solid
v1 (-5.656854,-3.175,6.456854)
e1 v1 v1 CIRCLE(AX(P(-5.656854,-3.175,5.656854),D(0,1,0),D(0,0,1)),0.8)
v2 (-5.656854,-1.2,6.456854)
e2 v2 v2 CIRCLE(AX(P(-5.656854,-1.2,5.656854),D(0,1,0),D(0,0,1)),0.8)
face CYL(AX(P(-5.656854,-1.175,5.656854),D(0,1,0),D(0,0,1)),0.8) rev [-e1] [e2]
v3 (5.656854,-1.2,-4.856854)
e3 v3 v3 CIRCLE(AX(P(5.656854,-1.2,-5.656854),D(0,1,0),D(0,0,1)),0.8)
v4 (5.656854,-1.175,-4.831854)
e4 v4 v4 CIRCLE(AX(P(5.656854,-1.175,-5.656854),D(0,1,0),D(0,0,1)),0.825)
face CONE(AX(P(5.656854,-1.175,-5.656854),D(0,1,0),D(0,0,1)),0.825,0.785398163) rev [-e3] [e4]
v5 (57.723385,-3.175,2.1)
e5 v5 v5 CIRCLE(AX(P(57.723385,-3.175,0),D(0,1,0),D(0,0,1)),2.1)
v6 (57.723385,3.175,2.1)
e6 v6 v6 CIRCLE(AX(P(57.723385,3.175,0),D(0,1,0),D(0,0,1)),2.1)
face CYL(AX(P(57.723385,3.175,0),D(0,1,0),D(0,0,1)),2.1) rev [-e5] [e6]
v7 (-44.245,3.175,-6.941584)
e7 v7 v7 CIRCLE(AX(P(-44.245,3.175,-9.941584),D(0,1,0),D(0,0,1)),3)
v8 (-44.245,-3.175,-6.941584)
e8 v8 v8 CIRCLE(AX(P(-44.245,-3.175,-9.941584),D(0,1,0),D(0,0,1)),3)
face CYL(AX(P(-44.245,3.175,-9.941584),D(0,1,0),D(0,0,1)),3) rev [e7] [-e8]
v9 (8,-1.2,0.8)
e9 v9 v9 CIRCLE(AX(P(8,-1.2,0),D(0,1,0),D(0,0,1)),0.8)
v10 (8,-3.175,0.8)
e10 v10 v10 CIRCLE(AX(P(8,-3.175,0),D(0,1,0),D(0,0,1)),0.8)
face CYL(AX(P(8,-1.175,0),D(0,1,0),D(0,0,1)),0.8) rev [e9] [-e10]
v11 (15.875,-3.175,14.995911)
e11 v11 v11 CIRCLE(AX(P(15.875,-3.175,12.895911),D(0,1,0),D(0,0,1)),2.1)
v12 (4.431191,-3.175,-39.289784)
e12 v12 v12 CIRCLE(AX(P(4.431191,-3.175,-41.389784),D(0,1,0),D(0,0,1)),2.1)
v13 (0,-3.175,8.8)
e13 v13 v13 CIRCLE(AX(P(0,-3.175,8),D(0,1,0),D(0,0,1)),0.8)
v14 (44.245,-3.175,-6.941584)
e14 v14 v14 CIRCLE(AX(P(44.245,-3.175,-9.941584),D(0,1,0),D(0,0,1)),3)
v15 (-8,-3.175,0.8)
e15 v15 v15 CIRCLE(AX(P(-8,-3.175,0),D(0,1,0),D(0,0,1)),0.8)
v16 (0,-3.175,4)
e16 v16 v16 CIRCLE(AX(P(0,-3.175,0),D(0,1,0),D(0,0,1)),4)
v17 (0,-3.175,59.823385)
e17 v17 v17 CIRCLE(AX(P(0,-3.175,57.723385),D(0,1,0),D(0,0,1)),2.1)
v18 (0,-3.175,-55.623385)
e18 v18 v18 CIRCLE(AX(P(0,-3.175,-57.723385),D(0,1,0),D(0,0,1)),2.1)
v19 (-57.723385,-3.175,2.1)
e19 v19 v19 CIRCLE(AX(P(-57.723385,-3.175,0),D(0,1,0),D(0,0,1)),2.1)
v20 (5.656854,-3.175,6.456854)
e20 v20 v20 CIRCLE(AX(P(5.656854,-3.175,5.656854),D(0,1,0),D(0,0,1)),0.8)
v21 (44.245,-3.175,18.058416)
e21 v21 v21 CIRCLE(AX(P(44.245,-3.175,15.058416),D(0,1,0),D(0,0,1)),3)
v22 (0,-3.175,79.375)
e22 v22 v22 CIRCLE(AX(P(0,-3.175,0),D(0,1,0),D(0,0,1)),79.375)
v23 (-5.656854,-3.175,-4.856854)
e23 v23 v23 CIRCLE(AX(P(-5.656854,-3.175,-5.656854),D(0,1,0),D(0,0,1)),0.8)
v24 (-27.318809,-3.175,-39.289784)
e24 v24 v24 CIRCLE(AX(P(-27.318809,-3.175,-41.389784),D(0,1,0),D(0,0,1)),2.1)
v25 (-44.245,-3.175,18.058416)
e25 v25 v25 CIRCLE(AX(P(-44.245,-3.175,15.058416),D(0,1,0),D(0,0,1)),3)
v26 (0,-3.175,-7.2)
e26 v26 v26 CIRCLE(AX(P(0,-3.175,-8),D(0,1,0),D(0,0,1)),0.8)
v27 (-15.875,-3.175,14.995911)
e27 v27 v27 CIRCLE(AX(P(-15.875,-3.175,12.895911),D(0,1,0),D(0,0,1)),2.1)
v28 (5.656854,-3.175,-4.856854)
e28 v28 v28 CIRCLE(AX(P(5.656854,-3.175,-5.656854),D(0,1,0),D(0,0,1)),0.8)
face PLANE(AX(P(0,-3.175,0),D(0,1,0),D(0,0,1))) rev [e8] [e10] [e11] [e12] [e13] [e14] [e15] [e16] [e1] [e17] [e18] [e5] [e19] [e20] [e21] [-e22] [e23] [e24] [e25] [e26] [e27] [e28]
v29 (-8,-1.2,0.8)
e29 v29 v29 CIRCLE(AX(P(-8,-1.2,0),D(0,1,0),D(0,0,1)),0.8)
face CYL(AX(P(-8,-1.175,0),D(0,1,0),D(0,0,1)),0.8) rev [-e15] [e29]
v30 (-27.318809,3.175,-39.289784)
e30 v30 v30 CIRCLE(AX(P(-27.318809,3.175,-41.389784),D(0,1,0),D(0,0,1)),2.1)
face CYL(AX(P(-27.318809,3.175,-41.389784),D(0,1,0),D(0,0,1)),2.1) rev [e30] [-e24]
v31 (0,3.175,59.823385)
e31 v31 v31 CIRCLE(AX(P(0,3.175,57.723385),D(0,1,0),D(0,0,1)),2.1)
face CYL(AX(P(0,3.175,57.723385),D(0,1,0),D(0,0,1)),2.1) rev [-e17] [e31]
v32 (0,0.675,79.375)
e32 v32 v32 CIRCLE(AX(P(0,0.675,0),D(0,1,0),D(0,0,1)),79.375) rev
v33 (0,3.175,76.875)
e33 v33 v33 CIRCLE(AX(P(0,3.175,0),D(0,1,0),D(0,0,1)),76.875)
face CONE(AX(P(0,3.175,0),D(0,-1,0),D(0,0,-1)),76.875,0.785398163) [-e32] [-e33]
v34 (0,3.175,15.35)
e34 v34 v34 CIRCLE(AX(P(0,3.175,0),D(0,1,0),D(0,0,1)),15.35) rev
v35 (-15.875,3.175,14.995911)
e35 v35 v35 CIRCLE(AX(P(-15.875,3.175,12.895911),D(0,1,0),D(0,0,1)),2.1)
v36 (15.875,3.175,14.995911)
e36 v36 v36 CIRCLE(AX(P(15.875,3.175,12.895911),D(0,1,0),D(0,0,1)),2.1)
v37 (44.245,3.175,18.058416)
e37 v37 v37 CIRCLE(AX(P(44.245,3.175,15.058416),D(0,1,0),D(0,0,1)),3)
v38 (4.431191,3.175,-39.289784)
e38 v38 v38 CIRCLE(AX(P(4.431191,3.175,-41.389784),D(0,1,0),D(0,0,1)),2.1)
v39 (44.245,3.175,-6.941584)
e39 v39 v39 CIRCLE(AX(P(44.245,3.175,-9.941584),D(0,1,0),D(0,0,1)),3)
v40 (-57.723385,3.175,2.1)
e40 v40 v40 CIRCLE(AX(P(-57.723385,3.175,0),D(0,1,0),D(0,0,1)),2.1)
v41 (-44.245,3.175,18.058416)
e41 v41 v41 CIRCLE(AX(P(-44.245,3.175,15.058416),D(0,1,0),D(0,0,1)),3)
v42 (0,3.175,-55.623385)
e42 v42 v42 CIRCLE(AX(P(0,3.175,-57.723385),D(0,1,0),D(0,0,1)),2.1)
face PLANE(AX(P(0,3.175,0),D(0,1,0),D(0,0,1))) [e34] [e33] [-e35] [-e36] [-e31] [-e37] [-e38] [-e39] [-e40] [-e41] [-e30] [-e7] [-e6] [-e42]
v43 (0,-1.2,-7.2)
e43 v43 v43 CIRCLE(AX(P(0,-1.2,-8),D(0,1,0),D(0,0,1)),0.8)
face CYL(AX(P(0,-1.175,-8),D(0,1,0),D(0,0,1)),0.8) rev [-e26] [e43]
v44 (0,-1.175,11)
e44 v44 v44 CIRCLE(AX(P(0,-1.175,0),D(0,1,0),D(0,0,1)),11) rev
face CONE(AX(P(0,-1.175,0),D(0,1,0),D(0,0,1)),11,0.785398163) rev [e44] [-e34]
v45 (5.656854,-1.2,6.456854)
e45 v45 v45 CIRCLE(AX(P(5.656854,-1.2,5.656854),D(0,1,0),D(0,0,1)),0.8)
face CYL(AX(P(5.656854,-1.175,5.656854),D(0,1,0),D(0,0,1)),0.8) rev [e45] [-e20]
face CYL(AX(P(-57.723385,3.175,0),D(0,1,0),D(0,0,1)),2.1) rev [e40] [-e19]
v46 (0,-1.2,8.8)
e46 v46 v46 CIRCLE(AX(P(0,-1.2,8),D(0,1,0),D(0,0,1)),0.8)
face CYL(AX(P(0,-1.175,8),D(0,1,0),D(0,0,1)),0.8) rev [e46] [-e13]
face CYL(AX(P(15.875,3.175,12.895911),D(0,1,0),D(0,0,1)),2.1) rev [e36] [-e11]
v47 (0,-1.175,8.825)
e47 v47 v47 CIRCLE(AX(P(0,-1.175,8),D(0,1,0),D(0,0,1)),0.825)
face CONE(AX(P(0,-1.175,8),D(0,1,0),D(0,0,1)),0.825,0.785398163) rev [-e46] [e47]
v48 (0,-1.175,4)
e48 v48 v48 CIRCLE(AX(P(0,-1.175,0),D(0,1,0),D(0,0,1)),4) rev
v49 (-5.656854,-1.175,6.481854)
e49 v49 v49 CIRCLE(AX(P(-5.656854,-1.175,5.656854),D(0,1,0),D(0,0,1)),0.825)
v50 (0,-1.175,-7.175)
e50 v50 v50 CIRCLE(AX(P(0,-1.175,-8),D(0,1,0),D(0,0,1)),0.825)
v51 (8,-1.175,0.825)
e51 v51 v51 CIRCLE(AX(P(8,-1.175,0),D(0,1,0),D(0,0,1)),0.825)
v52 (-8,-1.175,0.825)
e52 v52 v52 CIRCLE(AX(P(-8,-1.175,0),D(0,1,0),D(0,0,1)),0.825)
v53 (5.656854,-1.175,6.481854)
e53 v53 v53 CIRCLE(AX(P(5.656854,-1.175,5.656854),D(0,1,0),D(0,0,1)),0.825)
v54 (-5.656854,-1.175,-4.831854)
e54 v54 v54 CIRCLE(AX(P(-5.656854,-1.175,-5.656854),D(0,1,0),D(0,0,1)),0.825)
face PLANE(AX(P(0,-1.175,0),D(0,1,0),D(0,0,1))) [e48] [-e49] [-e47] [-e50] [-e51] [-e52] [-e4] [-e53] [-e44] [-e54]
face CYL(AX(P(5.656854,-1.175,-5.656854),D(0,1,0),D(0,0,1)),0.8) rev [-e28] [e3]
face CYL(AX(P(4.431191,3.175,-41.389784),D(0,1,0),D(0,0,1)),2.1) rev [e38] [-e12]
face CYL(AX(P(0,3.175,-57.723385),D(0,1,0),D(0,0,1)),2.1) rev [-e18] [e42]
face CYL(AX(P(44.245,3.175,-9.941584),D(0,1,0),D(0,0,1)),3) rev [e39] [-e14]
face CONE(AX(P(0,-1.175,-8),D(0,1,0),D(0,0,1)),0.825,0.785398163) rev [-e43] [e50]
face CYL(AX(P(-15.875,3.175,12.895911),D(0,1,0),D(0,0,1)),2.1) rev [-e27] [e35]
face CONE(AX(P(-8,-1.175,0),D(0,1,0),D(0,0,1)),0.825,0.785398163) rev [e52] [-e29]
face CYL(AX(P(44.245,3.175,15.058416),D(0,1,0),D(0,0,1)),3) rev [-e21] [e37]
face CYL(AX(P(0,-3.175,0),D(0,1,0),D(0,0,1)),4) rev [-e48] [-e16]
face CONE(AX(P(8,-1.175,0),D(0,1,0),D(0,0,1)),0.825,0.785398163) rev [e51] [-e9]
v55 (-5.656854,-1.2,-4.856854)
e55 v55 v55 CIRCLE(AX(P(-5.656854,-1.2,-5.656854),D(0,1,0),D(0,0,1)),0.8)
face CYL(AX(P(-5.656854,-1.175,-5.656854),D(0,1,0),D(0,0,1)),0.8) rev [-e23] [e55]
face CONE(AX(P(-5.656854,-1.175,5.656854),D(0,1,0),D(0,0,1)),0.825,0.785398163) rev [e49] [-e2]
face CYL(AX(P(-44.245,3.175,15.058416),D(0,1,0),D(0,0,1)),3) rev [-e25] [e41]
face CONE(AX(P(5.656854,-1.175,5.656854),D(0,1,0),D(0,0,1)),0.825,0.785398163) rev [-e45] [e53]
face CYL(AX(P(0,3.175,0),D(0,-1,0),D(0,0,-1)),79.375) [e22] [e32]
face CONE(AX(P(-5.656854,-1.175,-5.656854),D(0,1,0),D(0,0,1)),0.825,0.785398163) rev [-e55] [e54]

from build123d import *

# Parameters (mm, degrees)
SKETCH1_R                             = 79.375
BOSS_EXTRUDE1_DEPTH                   = 3.175
TAP_DRILL_FOR_M5X0_8_TAP1_D           = 4.2
TAP_DRILL_FOR_M7X1_0_TAP1_D           = 6
SKETCH32_R                            = 4
CUT_EXTRUDE1_DEPTH                    = 113.432663181
SKETCH32_4_R                          = 11
SKETCH32_4_R_2                        = 4
CUT_EXTRUDE2_DEPTH                    = 4.35
CHAMFER1_SIZE                         = 4.35
TAP_DRILL_FOR_M2X0_4_TAP1_D           = 1.6
TAP_DRILL_FOR_M2X0_4_TAP1_CSINK_D     = 1.65
TAP_DRILL_FOR_M2X0_4_TAP1_CSINK_ANGLE = 90
CHAMFER2_SIZE                         = 2.5
TAP_DRILL_FOR_M5X0_8_TAP2_D           = 4.2


with BuildPart() as part:
    # Sketch1 → Boss-Extrude1 (new, symmetric)
    with BuildSketch(Plane(origin=(0, 0, 0), x_dir=(1, 0, 0), z_dir=(0, 1, 0))):
        with Locations(Location((0, 0, 0), (0, 0, 270))):
            Circle(SKETCH1_R)
    extrude(amount=BOSS_EXTRUDE1_DEPTH, both=True)

    # Tap Drill for M5x0.8 Tap1 (through all)
    with Locations(Plane(origin=(0, 3.175, 0), x_dir=(1, 0, 0), z_dir=(0, 1, 0))):
        with Locations((-27.3188086, 41.38978387), (4.4311914, 41.38978387), (-15.875, -12.895910708), (15.875, -12.895910708)):
            Hole(TAP_DRILL_FOR_M5X0_8_TAP1_D / 2)

    # Tap Drill for M7x1.0 Tap1 (through all)
    with Locations(Plane(origin=(0, 3.175, 0), x_dir=(1, 0, 0), z_dir=(0, 1, 0))):
        with Locations((-44.245, 9.941583672), (-44.245, -15.058416328), (44.245, 9.941583672), (44.245, -15.058416328)):
            Hole(TAP_DRILL_FOR_M7X1_0_TAP1_D / 2)

    # Sketch32 → Cut-Extrude1 (cut, through all)
    with BuildSketch(Plane(origin=(0, 3.175, 0), x_dir=(1, 0, 0), z_dir=(0, 1, 0))):
        with Locations(Location((0, 0, 0), (0, 0, 270))):
            Circle(SKETCH32_R)
    extrude(amount=-CUT_EXTRUDE1_DEPTH, mode=Mode.SUBTRACT)

    # Sketch32<4> → Cut-Extrude2 (cut)
    with BuildSketch(Plane(origin=(0, 3.175, 0), x_dir=(1, 0, 0), z_dir=(0, 1, 0))):
        with Locations(Location((0, 0, 0), (0, 0, 270))):
            Circle(SKETCH32_4_R)
        with Locations(Location((0, 0, 0), (0, 0, 270))):
            Circle(SKETCH32_4_R_2, mode=Mode.SUBTRACT)
    extrude(amount=-CUT_EXTRUDE2_DEPTH, mode=Mode.SUBTRACT)

    # Chamfer1
    chamfer1_edges = [part.edges().sort_by_distance(p)[0] for p in [
        (0, 3.175, -11),
    ]]
    chamfer(chamfer1_edges, length=CHAMFER1_SIZE - 0.0001)  # a hair under: the kernel refuses the full size

    # Tap Drill for M2x0.4 Tap1 (through all)
    with Locations(Plane(origin=(0, -1.175, 0), x_dir=(1, 0, 0), z_dir=(0, 1, 0))):
        with Locations((-8, 0), (-5.656854249, 5.656854249), (0, 8), (5.656854249, 5.656854249), (8, 0), (5.656854249, -5.656854249), (0, -8), (-5.656854249, -5.656854249)):
            CounterSinkHole(TAP_DRILL_FOR_M2X0_4_TAP1_D / 2, TAP_DRILL_FOR_M2X0_4_TAP1_CSINK_D / 2, counter_sink_angle=TAP_DRILL_FOR_M2X0_4_TAP1_CSINK_ANGLE)

    # Chamfer2
    chamfer2_edges = [part.edges().sort_by_distance(p)[0] for p in [
        (0, 3.175, -79.375),
    ]]
    chamfer(chamfer2_edges, length=CHAMFER2_SIZE)

    # Tap Drill for M5x0.8 Tap2 (through all)
    with Locations(Plane(origin=(0, 3.175, 0), x_dir=(1, 0, 0), z_dir=(0, 1, 0))):
        with Locations((-57.723385101, 0), (0, 57.723385101), (57.723385101, 0), (0, -57.723385101)):
            Hole(TAP_DRILL_FOR_M5X0_8_TAP2_D / 2)


solid = part.part
